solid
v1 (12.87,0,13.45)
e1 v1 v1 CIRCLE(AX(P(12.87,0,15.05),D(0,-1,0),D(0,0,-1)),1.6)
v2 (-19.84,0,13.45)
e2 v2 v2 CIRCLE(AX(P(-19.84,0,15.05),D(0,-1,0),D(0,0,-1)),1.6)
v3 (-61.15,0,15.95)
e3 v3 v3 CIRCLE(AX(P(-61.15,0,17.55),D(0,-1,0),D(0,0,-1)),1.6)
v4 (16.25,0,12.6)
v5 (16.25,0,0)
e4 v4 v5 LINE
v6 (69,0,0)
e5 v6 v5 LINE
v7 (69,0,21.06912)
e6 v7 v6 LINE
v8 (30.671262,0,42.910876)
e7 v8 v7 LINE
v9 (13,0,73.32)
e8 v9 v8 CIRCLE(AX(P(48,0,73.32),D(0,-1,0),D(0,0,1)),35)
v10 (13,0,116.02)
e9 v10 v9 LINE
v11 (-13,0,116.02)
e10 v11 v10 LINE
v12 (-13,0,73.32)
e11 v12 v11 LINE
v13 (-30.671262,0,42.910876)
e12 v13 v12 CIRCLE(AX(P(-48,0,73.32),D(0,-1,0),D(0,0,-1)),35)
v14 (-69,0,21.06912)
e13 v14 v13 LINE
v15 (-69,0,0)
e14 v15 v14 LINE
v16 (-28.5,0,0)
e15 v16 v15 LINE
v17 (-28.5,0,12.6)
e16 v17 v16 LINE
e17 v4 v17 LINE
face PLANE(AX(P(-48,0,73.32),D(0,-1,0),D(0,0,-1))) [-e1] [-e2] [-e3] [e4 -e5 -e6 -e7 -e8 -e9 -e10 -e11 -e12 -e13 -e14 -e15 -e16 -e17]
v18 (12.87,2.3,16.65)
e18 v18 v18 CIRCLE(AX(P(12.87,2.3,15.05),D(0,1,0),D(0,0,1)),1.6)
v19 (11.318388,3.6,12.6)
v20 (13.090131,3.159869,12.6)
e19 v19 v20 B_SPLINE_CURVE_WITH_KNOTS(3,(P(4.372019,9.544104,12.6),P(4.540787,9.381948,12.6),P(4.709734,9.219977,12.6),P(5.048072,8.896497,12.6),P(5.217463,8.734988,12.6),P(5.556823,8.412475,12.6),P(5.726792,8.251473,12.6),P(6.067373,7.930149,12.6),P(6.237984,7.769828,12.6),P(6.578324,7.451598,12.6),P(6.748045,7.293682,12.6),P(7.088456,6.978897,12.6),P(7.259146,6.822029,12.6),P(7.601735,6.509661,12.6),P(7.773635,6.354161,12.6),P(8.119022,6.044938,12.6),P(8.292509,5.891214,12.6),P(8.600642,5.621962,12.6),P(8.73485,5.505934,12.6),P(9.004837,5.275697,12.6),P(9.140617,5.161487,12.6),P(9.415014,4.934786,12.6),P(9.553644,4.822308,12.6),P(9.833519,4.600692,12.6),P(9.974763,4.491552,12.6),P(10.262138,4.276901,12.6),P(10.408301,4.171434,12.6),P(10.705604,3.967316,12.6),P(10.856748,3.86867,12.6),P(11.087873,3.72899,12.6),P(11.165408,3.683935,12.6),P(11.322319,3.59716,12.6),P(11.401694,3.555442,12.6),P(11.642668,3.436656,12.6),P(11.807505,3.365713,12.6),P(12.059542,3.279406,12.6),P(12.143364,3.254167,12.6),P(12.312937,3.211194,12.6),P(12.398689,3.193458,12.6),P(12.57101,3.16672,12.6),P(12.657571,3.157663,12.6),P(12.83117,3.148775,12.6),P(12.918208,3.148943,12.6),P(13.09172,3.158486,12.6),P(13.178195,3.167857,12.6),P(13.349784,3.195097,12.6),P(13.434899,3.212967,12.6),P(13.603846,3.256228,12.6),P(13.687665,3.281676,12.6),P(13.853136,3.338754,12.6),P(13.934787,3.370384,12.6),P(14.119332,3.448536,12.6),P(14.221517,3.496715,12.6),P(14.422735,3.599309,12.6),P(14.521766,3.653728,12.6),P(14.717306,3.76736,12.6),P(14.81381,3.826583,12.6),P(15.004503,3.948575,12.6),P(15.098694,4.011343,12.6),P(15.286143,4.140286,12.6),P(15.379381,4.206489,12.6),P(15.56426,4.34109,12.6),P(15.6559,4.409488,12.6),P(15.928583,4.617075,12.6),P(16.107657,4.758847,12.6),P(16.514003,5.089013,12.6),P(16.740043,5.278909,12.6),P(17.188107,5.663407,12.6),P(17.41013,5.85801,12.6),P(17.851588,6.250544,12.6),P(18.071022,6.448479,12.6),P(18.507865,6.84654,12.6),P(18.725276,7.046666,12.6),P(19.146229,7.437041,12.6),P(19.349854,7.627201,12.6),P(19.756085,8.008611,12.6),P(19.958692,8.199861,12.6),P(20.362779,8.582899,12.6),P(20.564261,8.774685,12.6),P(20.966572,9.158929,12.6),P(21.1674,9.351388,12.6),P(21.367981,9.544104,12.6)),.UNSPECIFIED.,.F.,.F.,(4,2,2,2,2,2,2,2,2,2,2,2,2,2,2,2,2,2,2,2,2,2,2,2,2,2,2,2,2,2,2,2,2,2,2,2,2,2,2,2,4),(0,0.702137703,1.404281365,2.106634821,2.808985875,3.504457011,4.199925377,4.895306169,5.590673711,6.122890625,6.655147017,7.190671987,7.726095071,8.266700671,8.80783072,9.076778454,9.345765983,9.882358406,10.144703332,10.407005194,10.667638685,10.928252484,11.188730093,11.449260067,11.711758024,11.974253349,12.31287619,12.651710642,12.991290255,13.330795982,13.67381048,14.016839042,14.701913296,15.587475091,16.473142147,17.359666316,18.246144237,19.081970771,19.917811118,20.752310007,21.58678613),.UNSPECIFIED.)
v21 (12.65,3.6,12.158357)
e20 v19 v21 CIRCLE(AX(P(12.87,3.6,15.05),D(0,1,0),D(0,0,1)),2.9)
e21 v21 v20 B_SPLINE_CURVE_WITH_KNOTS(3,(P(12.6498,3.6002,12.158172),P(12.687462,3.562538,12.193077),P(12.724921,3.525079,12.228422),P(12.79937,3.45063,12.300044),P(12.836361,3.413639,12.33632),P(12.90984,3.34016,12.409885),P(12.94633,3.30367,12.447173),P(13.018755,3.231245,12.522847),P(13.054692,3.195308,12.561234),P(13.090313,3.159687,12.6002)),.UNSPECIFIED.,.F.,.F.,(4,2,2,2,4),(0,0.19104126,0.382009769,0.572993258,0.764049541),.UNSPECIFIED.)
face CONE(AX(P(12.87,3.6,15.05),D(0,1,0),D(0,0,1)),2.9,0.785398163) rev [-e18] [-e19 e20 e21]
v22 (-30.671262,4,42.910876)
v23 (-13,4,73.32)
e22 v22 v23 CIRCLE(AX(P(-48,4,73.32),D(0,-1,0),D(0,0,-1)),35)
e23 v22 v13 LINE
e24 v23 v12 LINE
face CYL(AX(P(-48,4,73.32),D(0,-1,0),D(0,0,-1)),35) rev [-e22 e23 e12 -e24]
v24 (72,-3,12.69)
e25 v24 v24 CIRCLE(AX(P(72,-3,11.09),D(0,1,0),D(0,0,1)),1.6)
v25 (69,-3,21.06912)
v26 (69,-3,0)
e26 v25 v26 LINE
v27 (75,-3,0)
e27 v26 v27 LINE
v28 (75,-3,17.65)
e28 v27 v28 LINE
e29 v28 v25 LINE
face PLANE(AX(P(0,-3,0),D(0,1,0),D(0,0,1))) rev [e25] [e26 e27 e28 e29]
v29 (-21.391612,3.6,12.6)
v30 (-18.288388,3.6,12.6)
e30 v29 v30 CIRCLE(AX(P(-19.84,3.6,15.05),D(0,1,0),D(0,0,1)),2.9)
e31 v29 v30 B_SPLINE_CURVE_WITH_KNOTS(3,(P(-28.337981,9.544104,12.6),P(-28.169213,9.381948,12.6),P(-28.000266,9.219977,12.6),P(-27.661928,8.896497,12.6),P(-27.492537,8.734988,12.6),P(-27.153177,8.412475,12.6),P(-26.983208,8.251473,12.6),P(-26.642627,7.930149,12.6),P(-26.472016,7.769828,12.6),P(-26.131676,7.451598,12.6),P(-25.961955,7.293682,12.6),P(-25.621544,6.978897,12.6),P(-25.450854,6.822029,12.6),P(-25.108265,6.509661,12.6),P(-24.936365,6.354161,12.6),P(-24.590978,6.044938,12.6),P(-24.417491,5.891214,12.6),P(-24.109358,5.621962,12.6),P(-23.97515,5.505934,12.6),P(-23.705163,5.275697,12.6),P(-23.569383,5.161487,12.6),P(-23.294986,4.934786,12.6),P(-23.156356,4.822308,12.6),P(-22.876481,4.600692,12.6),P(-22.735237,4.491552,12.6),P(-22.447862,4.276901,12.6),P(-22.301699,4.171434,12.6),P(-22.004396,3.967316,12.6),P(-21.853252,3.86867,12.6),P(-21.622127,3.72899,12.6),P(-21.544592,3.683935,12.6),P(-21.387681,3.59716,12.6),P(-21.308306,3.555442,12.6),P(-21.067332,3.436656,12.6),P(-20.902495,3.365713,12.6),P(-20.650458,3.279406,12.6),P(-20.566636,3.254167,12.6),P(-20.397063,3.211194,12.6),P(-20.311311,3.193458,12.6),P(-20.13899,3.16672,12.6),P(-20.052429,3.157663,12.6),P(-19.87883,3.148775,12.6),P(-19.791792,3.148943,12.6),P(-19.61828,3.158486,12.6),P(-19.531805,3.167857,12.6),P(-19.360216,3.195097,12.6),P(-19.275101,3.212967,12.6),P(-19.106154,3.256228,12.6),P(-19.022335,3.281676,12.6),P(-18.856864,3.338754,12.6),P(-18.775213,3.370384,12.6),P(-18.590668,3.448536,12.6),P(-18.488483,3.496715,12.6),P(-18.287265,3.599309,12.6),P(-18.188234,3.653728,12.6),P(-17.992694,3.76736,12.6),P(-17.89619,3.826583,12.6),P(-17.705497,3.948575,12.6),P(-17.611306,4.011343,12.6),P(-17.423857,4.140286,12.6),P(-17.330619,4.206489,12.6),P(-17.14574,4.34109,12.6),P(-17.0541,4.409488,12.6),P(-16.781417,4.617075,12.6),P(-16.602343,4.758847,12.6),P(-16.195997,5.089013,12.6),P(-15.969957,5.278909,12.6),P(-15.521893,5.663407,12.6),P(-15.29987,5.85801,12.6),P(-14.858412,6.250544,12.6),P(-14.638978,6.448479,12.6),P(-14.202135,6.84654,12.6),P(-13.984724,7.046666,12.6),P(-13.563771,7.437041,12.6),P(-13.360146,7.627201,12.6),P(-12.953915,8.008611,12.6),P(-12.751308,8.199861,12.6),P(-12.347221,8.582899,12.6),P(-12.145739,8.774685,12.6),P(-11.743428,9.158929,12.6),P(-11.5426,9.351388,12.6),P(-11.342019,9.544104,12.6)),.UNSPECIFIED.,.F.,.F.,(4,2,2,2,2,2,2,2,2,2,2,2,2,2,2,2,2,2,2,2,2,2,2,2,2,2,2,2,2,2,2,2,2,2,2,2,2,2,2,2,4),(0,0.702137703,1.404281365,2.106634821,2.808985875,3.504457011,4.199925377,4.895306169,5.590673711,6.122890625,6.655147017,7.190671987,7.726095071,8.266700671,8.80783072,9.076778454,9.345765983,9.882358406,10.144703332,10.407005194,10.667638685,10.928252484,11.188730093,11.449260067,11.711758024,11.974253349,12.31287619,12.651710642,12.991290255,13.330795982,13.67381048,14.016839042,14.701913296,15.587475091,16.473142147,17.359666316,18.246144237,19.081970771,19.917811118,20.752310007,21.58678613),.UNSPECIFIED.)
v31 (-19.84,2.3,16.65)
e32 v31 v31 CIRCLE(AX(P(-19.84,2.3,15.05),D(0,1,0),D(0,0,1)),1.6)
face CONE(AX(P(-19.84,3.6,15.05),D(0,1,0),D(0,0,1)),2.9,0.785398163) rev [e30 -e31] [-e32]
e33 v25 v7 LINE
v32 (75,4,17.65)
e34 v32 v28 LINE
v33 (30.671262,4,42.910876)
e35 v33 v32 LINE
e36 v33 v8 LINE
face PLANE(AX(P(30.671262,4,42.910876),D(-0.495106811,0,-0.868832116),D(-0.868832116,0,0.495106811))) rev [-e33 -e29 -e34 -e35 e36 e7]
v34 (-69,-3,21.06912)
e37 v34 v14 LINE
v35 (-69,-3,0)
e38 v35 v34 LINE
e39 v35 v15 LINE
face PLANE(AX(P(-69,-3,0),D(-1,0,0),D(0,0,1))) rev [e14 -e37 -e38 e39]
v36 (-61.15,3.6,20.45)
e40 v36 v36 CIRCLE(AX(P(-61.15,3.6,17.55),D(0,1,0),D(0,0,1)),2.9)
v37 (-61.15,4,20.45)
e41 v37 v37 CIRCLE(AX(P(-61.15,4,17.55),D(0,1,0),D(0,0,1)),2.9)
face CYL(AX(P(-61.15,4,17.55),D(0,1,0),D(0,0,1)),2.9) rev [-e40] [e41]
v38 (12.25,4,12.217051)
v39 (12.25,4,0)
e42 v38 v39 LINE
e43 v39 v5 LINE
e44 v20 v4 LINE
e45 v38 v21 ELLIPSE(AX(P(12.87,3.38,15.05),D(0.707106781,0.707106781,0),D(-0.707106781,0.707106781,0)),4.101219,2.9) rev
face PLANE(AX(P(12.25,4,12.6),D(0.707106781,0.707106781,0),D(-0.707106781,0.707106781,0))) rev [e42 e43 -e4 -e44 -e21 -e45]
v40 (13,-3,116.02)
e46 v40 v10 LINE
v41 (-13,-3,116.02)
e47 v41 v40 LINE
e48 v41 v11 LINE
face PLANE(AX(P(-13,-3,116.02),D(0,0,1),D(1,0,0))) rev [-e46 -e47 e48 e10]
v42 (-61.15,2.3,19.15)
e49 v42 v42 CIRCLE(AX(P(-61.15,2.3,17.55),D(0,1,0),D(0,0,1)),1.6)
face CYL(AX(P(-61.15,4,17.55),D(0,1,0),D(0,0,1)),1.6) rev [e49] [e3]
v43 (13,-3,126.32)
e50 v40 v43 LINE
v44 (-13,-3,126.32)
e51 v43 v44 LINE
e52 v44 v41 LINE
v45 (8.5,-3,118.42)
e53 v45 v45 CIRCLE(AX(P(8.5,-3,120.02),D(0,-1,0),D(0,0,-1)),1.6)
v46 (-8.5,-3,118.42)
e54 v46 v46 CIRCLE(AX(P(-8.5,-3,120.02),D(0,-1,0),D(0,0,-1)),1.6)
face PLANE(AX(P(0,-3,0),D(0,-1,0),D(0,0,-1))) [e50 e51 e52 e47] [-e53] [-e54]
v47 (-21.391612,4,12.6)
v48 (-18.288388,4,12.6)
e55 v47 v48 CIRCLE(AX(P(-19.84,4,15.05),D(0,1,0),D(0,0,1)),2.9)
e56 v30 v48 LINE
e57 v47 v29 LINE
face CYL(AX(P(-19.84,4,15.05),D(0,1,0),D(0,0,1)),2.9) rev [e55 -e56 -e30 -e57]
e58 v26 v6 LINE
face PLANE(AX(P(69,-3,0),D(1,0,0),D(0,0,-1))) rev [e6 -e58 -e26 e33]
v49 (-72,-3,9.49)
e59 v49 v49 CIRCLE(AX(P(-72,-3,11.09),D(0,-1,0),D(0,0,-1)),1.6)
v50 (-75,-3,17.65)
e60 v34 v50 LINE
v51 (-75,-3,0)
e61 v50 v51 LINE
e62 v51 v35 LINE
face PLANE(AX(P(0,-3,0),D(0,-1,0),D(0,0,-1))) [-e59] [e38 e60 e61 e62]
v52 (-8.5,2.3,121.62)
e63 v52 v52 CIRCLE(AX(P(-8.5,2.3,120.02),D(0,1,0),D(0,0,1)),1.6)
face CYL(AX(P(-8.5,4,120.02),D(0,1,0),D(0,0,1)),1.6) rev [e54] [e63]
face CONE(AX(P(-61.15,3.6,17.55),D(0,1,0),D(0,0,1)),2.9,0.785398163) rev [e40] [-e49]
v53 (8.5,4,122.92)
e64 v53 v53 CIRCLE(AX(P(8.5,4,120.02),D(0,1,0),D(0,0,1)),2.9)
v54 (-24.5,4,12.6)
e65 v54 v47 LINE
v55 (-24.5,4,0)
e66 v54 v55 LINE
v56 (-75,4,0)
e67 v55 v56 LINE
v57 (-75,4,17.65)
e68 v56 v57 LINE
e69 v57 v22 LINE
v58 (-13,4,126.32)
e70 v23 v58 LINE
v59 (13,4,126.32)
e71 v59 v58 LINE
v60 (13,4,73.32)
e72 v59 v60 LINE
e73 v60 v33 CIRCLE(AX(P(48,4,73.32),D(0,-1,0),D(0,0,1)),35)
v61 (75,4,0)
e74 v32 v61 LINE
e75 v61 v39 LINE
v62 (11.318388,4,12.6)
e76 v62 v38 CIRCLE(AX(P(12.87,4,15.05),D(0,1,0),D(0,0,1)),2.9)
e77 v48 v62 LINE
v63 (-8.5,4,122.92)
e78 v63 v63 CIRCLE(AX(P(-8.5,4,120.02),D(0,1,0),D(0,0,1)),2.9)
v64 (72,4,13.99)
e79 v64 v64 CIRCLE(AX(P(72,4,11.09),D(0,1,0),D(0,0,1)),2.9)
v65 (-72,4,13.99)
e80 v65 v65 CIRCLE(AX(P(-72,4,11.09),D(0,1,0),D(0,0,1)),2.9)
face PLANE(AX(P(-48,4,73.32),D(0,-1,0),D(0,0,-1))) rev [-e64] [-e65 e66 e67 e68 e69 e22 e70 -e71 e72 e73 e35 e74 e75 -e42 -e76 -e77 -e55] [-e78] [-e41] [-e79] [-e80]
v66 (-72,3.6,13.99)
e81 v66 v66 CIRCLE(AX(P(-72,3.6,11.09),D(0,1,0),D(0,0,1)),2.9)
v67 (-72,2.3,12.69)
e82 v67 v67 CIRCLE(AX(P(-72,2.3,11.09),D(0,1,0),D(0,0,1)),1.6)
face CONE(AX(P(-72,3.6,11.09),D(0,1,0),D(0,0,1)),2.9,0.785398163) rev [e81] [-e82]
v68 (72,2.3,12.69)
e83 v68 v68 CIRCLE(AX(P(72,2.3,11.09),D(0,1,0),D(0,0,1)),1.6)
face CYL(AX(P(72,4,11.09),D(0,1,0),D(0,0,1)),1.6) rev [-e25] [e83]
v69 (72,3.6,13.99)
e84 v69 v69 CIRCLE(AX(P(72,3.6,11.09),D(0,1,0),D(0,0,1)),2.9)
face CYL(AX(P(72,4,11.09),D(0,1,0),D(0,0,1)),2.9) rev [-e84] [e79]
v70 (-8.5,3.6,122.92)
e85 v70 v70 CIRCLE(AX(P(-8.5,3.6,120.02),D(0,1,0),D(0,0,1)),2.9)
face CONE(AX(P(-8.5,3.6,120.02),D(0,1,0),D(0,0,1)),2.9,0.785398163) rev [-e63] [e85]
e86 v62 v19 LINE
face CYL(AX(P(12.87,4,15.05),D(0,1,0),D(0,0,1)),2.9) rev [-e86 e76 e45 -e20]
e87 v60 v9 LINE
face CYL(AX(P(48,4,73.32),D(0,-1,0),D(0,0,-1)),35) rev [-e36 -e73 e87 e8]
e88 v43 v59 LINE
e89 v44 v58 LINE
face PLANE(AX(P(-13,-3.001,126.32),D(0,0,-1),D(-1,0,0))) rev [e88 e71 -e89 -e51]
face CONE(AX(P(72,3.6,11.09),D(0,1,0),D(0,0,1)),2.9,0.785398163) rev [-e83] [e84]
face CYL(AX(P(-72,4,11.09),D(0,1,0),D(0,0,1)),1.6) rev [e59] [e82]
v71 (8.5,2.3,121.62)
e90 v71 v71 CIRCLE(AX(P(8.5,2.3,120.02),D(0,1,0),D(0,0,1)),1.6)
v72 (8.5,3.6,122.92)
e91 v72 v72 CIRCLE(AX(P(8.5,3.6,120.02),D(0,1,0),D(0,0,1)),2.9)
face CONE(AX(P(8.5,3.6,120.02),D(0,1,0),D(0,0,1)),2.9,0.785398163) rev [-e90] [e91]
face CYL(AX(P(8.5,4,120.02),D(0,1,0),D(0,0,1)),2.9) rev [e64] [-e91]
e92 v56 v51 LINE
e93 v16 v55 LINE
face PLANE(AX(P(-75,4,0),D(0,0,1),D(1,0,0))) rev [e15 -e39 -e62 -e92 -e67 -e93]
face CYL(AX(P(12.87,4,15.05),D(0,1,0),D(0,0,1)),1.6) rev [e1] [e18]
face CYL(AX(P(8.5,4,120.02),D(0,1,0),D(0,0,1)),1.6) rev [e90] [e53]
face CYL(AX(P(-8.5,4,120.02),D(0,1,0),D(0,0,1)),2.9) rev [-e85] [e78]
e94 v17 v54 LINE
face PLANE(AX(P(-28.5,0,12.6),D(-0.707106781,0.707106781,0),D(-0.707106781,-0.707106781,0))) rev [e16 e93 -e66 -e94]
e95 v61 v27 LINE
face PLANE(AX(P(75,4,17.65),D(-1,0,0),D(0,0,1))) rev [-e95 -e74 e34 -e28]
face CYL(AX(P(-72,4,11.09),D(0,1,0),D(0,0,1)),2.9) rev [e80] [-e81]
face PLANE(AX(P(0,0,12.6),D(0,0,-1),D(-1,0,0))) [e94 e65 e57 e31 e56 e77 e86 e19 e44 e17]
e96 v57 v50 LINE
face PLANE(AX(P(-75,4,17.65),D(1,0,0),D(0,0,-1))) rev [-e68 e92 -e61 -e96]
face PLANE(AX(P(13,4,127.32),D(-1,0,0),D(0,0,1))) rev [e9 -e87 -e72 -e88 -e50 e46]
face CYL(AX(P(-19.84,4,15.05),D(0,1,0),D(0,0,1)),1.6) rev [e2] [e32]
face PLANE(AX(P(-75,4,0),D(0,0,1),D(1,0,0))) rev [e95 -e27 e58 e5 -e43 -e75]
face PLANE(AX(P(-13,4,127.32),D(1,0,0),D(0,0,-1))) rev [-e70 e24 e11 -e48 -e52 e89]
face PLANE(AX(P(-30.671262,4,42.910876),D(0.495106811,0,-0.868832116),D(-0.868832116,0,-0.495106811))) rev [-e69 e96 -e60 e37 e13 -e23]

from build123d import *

# Parameters (mm, degrees)
BOSS_EXTRU_1_DEPTH       = 4
BOSS_EXTRU_6_DEPTH       = 3
ESQUISSE22_W             = 26
ESQUISSE22_H             = 11.3
BOSS_EXTRU_7_DEPTH       = 3
ENL_V_MAT_EXTRU_9_DEPTH  = 12.6
ENL_V_MAT_EXTRU_10_REACH = 149.934
ESQUISSE23_W             = 26
ESQUISSE23_H             = 1


# Read off the part's stored shape, not the designer's step: Fraisage pour vis à tête fraisée à 6 pans creux M31
with BuildPart() as part:
    # Esquisse1 → Boss.-Extru.1 (new body)
    with BuildSketch(Plane(origin=(0, 0, 0), x_dir=(1, 0, 0), z_dir=(0, 1, 0))):
        with BuildLine():
            Line((-13, -127.32), (-13, -73.32))
            ThreePointArc((-13, -73.32), (-17.738590223, -55.734577677), (-30.671261616, -42.910875941))
            Line((-30.671261616, -42.910875941), (-75, -17.65))
            Line((-75, -17.65), (-75, 0))
            Line((-75, 0), (75, 0))
            Line((75, 0), (75, -17.65))
            Line((75, -17.65), (30.671261616, -42.910875941))
            ThreePointArc((30.671261616, -42.910875941), (17.738590223, -55.734577677), (13, -73.32))
            Line((13, -73.32), (13, -127.32))
            Line((13, -127.32), (-13, -127.32))
        make_face()
    extrude(amount=BOSS_EXTRU_1_DEPTH)

    # Esquisse21 → Boss.-Extru.6 (add)
    with BuildSketch(Plane(origin=(0, 0, 0), x_dir=(-1, 0, 0), z_dir=(0, -1, 0))):
        Polygon((75, 0), (69, 0), (69, -21.069119541), (75, -17.65), align=None)
        Polygon((-75, 0), (-69, 0), (-69, -21.069119541), (-75, -17.65), align=None)
    extrude(amount=BOSS_EXTRU_6_DEPTH)

    # Esquisse22 → Boss.-Extru.7 (add)
    with BuildSketch(Plane.XZ):
        with Locations((0, 121.67)):
            Rectangle(ESQUISSE22_W, ESQUISSE22_H)
    extrude(amount=BOSS_EXTRU_7_DEPTH)

    # Fraisage pour vis _ t_te frais_e _ 6 2 → Fraisage pour vis à tête fraisée à 6 pans creux M31 (revolve, cut)
    with BuildSketch(Plane(origin=(8.5, 0, 120.02), x_dir=(1, 0, 0), z_dir=(0, 0, 1))):
        Polygon((0, -3), (1.6, -3), (1.6, 2.3), (2.9, 3.6), (2.9, 4), (0, 4), align=None)
    revolve(axis=Axis((8.5, 0, 120.02), (0, 1, 0)), mode=Mode.SUBTRACT)

    # Fraisage pour vis _ t_te frais_e _ 6 3 o → Fraisage pour vis _ t_te frais_e _ 6 3 (revolve, cut)
    with BuildSketch(Plane(origin=(-8.5, 0, 120.02), x_dir=(1, 0, 0), z_dir=(0, 0, 1))):
        Polygon((0, -3), (1.6, -3), (1.6, 2.3), (2.9, 3.6), (2.9, 4), (0, 4), align=None)
    revolve(axis=Axis((-8.5, 0, 120.02), (0, 1, 0)), mode=Mode.SUBTRACT)

    # Fraisage pour vis _ t_te frais_e _ 6 4 o → Fraisage pour vis _ t_te frais_e _ 6 4 (revolve, cut)
    with BuildSketch(Plane(origin=(-61.15, 0, 17.55), x_dir=(1, 0, 0), z_dir=(0, 0, 1))):
        Polygon((0, 0), (1.6, 0), (1.6, 2.3), (2.9, 3.6), (2.9, 4), (0, 4), align=None)
    revolve(axis=Axis((-61.15, 0, 17.55), (0, 1, 0)), mode=Mode.SUBTRACT)

    # Fraisage pour vis _ t_te frais_e _ 6 5 o → Fraisage pour vis _ t_te frais_e _ 6 5 (revolve, cut)
    with BuildSketch(Plane(origin=(-72, 0, 11.09), x_dir=(1, 0, 0), z_dir=(0, 0, 1))):
        Polygon((0, -3), (1.6, -3), (1.6, 2.3), (2.9, 3.6), (2.9, 4), (0, 4), align=None)
    revolve(axis=Axis((-72, 0, 11.09), (0, 1, 0)), mode=Mode.SUBTRACT)

    # Fraisage pour vis _ t_te frais_e _ 6 6 o → Fraisage pour vis _ t_te frais_e _ 6 6 (revolve, cut)
    with BuildSketch(Plane(origin=(72, 0, 11.09), x_dir=(1, 0, 0), z_dir=(0, 0, 1))):
        Polygon((0, -3), (1.6, -3), (1.6, 2.3), (2.9, 3.6), (2.9, 4), (0, 4), align=None)
    revolve(axis=Axis((72, 0, 11.09), (0, 1, 0)), mode=Mode.SUBTRACT)

    # Fraisage pour vis _ t_te frais_e _ 6 7 o → Fraisage pour vis _ t_te frais_e _ 6 7 (revolve, cut)
    with BuildSketch(Plane(origin=(12.87, 0, 15.05), x_dir=(1, 0, 0), z_dir=(0, 0, 1))):
        Polygon((0, 0), (1.6, 0), (1.6, 2.3), (2.9, 3.6), (2.9, 4), (0, 4), align=None)
    revolve(axis=Axis((12.87, 0, 15.05), (0, 1, 0)), mode=Mode.SUBTRACT)

    # Fraisage pour vis _ t_te frais_e _ 6 8 o → Fraisage pour vis _ t_te frais_e _ 6 8 (revolve, cut)
    with BuildSketch(Plane(origin=(-19.84, 0, 15.05), x_dir=(1, 0, 0), z_dir=(0, 0, 1))):
        Polygon((0, 0), (1.6, 0), (1.6, 2.3), (2.9, 3.6), (2.9, 4), (0, 4), align=None)
    revolve(axis=Axis((-19.84, 0, 15.05), (0, 1, 0)), mode=Mode.SUBTRACT)

    # Esquisse16 → Enlèv. mat.-Extru.9 (cut)
    with BuildSketch(Plane(origin=(0, 0, 0), x_dir=(-1, 0, 0), z_dir=(0, 0, -1))):
        Polygon((28.5, 0), (24.5, 4), (-12.25, 4), (-16.25, 0), align=None)
    extrude(amount=-ENL_V_MAT_EXTRU_9_DEPTH, mode=Mode.SUBTRACT)

    # Esquisse23 → Enlèv. mat.-Extru.10 (cut, up to next)
    with BuildSketch(Plane(origin=(0, 4, 0), x_dir=(1, 0, 0), z_dir=(0, 1, 0)), mode=Mode.PRIVATE) as enl_v_mat_extru_10_sk1:
        with Locations((0, -126.82)):
            Rectangle(ESQUISSE23_W, ESQUISSE23_H)
    enl_v_mat_extru_10_tool1 = extrude(enl_v_mat_extru_10_sk1.sketch, amount=-ENL_V_MAT_EXTRU_10_REACH, mode=Mode.PRIVATE) & part.part
    add(enl_v_mat_extru_10_tool1.solids().sort_by_distance((0, 4, 126.82))[0], mode=Mode.SUBTRACT)


solid = part.part
